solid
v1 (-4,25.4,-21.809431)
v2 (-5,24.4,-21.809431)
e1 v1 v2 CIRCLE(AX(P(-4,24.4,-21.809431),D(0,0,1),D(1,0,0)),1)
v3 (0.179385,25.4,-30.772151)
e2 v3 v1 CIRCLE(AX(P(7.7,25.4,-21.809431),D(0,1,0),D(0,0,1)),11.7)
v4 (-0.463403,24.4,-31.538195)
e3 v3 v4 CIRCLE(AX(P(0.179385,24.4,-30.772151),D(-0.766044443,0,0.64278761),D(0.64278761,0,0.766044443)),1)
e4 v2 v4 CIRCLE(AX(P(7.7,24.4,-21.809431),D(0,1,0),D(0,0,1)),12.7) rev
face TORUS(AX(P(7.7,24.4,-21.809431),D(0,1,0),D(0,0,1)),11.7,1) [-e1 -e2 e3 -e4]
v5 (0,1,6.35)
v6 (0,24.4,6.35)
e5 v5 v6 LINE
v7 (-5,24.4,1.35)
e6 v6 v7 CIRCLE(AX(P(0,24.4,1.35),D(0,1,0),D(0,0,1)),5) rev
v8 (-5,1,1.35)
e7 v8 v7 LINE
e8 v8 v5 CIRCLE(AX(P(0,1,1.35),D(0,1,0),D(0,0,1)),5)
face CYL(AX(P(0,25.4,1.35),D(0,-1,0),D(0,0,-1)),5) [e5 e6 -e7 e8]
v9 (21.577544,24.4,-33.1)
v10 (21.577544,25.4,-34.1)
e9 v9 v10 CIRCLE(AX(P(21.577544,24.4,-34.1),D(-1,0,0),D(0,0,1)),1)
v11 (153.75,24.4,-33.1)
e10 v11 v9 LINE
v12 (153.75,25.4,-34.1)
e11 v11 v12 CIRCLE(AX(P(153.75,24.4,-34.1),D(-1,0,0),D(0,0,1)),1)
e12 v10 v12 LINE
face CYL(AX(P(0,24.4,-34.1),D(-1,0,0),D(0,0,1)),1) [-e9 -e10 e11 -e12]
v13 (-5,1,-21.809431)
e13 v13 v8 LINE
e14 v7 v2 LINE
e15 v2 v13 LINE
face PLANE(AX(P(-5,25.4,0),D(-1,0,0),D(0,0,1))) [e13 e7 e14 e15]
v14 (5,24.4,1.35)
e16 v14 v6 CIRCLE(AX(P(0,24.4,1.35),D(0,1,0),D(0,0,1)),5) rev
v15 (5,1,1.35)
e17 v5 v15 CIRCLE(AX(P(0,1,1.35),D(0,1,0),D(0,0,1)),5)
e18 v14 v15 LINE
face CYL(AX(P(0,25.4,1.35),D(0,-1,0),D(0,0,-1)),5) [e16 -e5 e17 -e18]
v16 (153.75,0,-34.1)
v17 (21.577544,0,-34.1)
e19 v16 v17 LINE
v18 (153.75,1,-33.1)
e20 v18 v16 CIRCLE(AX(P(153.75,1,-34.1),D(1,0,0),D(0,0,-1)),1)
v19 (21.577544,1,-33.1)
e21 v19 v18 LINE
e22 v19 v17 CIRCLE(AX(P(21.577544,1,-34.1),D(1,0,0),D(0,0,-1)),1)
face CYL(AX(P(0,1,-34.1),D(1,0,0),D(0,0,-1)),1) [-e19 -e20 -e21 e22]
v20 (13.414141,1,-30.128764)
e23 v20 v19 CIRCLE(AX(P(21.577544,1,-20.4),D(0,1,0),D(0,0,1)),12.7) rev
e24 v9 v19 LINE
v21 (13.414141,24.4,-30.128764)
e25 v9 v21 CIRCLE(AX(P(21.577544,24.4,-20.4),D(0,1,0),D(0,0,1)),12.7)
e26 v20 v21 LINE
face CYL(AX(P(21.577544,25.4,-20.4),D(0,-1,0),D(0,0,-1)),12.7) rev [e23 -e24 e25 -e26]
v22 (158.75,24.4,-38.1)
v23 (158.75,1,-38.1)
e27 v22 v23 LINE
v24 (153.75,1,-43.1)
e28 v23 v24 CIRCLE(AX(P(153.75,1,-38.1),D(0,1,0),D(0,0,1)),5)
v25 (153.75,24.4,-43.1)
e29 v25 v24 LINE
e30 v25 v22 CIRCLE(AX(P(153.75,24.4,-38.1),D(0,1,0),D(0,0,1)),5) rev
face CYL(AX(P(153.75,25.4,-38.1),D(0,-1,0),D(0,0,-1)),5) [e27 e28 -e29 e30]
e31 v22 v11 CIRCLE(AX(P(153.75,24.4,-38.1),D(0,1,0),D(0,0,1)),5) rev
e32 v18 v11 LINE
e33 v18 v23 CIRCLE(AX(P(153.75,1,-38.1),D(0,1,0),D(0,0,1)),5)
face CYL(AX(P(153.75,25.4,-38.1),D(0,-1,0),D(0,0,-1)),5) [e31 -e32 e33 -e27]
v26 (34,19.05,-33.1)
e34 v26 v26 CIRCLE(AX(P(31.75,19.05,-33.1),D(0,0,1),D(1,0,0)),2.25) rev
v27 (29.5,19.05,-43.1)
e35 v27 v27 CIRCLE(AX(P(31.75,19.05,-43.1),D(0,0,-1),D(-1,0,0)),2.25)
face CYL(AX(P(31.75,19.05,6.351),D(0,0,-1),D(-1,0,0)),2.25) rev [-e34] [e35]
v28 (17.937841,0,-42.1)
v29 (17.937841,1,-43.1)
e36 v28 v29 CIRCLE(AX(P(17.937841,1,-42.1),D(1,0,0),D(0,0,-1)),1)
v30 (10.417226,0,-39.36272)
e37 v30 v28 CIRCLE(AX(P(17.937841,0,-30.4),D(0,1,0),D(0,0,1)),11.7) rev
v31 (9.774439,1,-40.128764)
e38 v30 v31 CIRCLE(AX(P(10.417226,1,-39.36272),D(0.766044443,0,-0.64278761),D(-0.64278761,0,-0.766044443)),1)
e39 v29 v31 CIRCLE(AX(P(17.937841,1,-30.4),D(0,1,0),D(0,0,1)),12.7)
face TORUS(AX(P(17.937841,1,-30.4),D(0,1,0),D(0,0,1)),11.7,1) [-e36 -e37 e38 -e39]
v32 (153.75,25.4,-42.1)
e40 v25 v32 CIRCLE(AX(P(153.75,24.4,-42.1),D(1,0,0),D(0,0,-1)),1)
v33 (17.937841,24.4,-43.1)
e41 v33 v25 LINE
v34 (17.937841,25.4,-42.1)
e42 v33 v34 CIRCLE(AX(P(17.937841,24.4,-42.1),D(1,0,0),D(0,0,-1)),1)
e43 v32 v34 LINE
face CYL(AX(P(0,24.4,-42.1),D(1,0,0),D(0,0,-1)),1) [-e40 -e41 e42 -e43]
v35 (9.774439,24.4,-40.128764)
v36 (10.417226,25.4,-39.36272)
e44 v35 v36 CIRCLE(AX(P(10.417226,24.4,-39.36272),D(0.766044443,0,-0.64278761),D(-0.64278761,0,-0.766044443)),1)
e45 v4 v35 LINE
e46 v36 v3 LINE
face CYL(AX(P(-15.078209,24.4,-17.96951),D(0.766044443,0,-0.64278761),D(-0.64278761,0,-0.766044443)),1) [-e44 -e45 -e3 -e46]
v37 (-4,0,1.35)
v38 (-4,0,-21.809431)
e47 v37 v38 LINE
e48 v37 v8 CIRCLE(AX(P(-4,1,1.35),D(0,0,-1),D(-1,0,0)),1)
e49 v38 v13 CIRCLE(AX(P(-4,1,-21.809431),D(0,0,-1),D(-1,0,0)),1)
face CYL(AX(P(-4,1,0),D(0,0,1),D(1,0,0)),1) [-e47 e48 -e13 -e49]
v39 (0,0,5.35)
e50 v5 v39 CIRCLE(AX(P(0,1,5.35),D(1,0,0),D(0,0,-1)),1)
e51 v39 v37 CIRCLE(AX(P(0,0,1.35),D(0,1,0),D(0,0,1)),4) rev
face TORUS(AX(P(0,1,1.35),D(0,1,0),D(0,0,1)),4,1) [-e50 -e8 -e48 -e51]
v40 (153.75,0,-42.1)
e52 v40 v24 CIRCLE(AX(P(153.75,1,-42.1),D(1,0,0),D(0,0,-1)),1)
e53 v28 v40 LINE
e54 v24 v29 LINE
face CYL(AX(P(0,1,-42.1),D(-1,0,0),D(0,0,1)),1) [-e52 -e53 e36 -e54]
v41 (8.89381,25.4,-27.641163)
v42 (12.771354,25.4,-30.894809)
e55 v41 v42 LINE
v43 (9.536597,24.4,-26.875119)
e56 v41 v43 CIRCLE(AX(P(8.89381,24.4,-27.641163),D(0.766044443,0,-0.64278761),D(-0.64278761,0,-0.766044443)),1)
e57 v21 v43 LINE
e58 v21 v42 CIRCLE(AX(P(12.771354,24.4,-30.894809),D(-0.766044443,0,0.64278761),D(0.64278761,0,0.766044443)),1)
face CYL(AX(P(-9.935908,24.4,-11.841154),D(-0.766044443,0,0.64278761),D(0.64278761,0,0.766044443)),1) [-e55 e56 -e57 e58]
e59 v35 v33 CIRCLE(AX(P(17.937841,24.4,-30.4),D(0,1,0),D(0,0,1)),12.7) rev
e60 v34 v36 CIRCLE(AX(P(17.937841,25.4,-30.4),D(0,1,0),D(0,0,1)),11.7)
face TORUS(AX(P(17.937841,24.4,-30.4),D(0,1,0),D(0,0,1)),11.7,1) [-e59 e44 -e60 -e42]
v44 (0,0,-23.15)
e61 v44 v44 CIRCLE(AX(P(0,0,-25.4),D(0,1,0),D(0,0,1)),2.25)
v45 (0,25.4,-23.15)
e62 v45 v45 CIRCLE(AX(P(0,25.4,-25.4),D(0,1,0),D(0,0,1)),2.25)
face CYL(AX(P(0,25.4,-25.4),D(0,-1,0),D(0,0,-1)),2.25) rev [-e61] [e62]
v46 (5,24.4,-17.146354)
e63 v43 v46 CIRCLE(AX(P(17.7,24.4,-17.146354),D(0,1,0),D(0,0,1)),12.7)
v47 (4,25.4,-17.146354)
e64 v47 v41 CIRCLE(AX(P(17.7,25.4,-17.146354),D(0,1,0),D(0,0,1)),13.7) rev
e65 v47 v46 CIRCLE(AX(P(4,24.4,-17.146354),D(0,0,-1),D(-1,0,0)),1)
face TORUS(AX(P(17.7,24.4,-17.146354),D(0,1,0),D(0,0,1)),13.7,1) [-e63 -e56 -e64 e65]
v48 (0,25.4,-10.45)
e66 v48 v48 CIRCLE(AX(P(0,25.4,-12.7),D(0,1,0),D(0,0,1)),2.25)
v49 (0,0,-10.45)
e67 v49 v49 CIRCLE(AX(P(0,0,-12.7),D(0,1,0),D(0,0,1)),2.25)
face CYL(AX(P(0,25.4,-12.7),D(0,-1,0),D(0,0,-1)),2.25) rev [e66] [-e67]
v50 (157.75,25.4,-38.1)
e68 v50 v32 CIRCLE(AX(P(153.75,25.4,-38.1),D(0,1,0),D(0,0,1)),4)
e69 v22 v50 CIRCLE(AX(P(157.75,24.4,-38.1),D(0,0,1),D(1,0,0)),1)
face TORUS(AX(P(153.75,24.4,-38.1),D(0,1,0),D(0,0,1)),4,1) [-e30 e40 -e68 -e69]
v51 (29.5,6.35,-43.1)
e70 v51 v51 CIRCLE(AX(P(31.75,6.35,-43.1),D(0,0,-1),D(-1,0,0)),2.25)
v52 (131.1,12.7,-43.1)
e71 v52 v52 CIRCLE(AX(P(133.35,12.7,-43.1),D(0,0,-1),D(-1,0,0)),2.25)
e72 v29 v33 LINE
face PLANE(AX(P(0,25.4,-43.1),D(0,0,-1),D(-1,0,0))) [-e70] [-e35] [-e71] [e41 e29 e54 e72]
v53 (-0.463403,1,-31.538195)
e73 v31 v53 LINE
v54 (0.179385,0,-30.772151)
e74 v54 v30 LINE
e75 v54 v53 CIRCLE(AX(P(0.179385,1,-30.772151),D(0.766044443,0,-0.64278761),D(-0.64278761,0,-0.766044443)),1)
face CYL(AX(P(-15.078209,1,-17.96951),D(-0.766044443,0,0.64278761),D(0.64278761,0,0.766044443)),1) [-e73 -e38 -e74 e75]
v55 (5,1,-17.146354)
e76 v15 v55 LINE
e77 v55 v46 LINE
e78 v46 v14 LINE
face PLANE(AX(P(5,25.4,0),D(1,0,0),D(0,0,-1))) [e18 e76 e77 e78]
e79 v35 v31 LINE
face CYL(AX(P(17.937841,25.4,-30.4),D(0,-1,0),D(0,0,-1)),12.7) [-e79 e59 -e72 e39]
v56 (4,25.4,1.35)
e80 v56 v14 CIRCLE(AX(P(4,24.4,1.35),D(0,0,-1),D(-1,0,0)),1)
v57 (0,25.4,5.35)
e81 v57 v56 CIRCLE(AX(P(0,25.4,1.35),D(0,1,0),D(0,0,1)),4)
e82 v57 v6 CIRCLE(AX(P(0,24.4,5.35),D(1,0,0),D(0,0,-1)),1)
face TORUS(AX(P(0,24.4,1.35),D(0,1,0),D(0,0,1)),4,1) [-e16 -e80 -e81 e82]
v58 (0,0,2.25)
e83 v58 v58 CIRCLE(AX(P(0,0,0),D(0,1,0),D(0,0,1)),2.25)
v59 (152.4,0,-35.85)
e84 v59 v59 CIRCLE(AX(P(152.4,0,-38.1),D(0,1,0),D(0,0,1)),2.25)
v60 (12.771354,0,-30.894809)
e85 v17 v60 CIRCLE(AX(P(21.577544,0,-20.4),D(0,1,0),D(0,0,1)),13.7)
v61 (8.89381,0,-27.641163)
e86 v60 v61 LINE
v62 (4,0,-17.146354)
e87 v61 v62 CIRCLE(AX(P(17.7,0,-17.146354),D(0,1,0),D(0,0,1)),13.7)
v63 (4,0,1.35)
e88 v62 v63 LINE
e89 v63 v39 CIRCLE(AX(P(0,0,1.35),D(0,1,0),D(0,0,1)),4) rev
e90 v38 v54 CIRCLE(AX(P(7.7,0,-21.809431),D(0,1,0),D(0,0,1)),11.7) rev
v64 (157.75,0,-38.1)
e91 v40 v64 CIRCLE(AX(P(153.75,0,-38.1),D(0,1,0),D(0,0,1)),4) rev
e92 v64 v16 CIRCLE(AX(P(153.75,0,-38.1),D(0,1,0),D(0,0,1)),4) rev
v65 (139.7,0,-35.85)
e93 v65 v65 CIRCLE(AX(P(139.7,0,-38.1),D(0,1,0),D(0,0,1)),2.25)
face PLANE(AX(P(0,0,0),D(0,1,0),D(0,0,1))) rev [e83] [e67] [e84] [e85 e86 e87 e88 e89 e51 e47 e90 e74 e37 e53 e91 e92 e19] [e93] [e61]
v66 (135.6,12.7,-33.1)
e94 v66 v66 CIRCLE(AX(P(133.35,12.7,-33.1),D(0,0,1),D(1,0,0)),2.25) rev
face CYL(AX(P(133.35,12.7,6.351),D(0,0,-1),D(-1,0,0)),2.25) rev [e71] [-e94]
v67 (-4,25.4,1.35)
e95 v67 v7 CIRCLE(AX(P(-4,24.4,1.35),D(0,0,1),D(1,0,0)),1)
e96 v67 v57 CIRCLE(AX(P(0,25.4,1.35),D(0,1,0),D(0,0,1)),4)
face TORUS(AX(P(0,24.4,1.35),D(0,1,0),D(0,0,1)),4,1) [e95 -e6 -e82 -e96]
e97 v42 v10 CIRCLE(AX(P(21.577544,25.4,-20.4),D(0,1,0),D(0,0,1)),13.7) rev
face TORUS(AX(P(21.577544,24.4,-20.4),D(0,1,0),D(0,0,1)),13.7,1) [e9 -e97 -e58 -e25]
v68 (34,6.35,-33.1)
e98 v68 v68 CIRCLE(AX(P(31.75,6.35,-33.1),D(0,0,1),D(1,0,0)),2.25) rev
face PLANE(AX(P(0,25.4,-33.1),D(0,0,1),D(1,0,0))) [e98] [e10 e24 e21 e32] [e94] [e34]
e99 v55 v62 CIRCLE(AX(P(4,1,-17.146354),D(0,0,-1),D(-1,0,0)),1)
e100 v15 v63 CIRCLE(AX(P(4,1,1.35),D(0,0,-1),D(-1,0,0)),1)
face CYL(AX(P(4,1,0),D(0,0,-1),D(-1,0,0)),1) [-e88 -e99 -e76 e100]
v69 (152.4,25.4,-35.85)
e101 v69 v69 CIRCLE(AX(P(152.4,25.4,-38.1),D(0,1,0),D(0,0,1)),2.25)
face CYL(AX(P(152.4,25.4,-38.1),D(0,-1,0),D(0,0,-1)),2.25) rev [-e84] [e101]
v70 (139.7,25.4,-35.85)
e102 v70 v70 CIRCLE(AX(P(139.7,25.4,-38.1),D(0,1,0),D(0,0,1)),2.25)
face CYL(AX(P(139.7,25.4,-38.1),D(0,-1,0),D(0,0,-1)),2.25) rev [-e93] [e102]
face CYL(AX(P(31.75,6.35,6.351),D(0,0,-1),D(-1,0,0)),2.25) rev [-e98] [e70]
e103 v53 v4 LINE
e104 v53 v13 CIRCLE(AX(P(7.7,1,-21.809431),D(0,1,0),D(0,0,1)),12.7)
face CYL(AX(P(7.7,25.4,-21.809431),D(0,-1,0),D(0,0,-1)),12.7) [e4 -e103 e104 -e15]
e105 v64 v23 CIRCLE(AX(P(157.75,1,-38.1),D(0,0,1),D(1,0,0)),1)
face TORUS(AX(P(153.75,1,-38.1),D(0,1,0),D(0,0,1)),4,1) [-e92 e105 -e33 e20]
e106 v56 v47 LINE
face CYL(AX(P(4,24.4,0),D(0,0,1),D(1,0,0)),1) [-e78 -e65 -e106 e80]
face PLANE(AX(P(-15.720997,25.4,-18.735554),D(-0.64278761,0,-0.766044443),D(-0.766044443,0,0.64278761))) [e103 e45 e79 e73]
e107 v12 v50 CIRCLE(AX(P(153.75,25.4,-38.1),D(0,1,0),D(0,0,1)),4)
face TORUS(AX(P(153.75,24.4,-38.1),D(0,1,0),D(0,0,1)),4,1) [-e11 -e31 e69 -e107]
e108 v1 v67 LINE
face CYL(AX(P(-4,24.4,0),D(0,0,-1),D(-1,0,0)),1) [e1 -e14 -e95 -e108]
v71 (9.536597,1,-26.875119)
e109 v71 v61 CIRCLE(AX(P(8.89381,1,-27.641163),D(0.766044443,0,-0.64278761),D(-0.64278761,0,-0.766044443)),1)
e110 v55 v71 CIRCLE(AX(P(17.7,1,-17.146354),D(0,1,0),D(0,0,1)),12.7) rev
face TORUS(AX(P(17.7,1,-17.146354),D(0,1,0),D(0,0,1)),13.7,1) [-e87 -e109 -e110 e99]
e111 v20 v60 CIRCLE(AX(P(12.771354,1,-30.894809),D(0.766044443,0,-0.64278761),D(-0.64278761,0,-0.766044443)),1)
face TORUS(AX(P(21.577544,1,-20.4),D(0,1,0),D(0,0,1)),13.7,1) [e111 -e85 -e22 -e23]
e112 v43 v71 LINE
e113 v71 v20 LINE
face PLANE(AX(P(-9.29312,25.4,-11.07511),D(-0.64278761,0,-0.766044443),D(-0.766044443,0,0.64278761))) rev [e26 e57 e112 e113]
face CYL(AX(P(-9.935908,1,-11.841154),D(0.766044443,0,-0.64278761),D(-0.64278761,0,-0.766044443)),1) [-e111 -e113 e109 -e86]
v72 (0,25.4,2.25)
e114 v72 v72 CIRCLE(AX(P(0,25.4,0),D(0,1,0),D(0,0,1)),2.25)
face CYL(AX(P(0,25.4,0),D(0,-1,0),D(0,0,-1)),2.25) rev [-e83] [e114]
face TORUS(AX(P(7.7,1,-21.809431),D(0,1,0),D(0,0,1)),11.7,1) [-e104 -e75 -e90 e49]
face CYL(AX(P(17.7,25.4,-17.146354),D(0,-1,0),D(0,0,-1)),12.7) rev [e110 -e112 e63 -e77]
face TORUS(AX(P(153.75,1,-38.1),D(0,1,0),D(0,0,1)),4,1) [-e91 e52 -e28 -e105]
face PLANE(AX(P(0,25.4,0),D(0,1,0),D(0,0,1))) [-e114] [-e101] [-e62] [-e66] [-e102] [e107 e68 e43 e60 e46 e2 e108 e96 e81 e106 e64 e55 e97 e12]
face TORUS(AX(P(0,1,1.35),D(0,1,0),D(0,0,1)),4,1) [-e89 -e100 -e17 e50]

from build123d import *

# Parameters (mm, degrees)
SKETCH1_R           = 2.25
BOSS_EXTRUDE1_DEPTH = 25.4
FILLET2_R           = 5
CUT_EXTRUDE2_REACH  = 170.202
SKETCH3_R           = 2.25
FILLET4_R           = 12.7
FILLET5_R           = 1


with BuildPart() as part:
    # Sketch1 → Boss-Extrude1 (new body)
    # profile 1 of 2: a face of its own
    with BuildSketch(Plane(origin=(0, 0, 0), x_dir=(1, 0, 0), z_dir=(0, 1, 0))):
        Polygon((158.75, 33.1), (158.75, 43.1), (13.315419455, 43.1), (-5, 27.731538291), (-5, -6.35), (5, -6.35), (5, 23.068461709), (5, 33.1), (16.955121797, 33.1), align=None)
        with Locations(Location((0, 0, 0), (0, 0, 270))):
            Circle(SKETCH1_R, mode=Mode.SUBTRACT)
        with Locations(Location((0, 12.7, 0), (0, 0, 270))):
            Circle(SKETCH1_R, mode=Mode.SUBTRACT)
        with Locations(Location((0, 25.4, 0), (0, 0, 270))):
            Circle(SKETCH1_R, mode=Mode.SUBTRACT)
        with Locations(Location((139.7, 38.1, 0), (0, 0, 270))):
            Circle(SKETCH1_R, mode=Mode.SUBTRACT)
        with Locations(Location((152.4, 38.1, 0), (0, 0, 270))):
            Circle(SKETCH1_R, mode=Mode.SUBTRACT)
    # profile 2 of 2: a face of its own
    with BuildSketch(Plane(origin=(0, 0, 0), x_dir=(1, 0, 0), z_dir=(0, 1, 0))):
        Polygon((5, 23.068461709), (16.955121797, 33.1), (5, 33.1), align=None)
    extrude(amount=BOSS_EXTRUDE1_DEPTH)

    # Fillet2
    fillet2_edges = [part.edges().sort_by_distance(p)[0] for p in [
        (-5, 12.7, 6.35),
        (5, 12.7, 6.35),
        (158.75, 12.7, -43.1),
        (158.75, 12.7, -33.1),
    ]]
    fillet(fillet2_edges, radius=FILLET2_R - 0.0001)  # a hair under: the kernel refuses the full size

    # Sketch3 → Cut-Extrude2 (cut, up to next)
    with BuildSketch(Plane(origin=(0, 0, -43.1), x_dir=(-1, 0, 0), z_dir=(0, 0, -1)), mode=Mode.PRIVATE) as cut_extrude2_sk1:
        with Locations((-31.75, 6.35)):
            Circle(SKETCH3_R)
    cut_extrude2_tool1 = extrude(cut_extrude2_sk1.sketch, amount=-CUT_EXTRUDE2_REACH, mode=Mode.PRIVATE) & part.part
    # Sketch3 → Cut-Extrude2 (cut, up to next)
    with BuildSketch(Plane(origin=(0, 0, -43.1), x_dir=(-1, 0, 0), z_dir=(0, 0, -1)), mode=Mode.PRIVATE) as cut_extrude2_sk2:
        with Locations((-31.75, 19.05)):
            Circle(SKETCH3_R)
    cut_extrude2_tool2 = extrude(cut_extrude2_sk2.sketch, amount=-CUT_EXTRUDE2_REACH, mode=Mode.PRIVATE) & part.part
    # Sketch3 → Cut-Extrude2 (cut, up to next)
    with BuildSketch(Plane(origin=(0, 0, -43.1), x_dir=(-1, 0, 0), z_dir=(0, 0, -1)), mode=Mode.PRIVATE) as cut_extrude2_sk3:
        with Locations((-133.35, 12.7)):
            Circle(SKETCH3_R)
    cut_extrude2_tool3 = extrude(cut_extrude2_sk3.sketch, amount=-CUT_EXTRUDE2_REACH, mode=Mode.PRIVATE) & part.part
    add(cut_extrude2_tool1.solids().sort_by_distance((31.75, 6.35, -43.1))[0], mode=Mode.SUBTRACT)
    add(cut_extrude2_tool2.solids().sort_by_distance((31.75, 19.05, -43.1))[0], mode=Mode.SUBTRACT)
    add(cut_extrude2_tool3.solids().sort_by_distance((133.35, 12.7, -43.1))[0], mode=Mode.SUBTRACT)

    # Fillet4
    fillet4_edges = [part.edges().sort_by_distance(p)[0] for p in [
        (-5, 12.7, -27.731538291),
        (13.315419455, 12.7, -43.1),
        (16.955121797, 12.7, -33.1),
        (5, 12.7, -23.068461709),
    ]]
    fillet(fillet4_edges, radius=FILLET4_R)

    # Fillet5
    fillet5_edges = [part.edges().sort_by_distance(p)[0] for p in [
        (-5, 0, -10.229665516),
        (87.663821886, 0, -33.1),
        (157.285563195, 0, -34.564436805),
        (157.285563195, 0, -41.635563195),
        (3.535563195, 0, 4.885563195),
        (-3.535563195, 0, 4.885563195),
        (-5, 25.4, -10.229665516),
        (87.663821886, 25.4, -33.1),
        (157.285563195, 25.4, -34.564436805),
        (157.285563195, 25.4, -41.635563195),
        (3.535563195, 25.4, 4.885563195),
        (-3.535563195, 25.4, 4.885563195),
        (11.475369243, 0, -28.501941653),
        (11.475369243, 25.4, -28.501941653),
        (5, 25.4, -7.898127225),
        (5, 0, -7.898127225),
        (4.655518072, 0, -35.833479944),
        (4.655518072, 25.4, -35.833479944),
        (85.843970715, 0, -43.1),
        (-3.810108895, 0, -27.176682956),
        (13.59418561, 0, -42.334096284),
        (85.843970715, 25.4, -43.1),
        (-3.810108895, 25.4, -27.176682956),
        (13.59418561, 25.4, -42.334096284),
        (17.233887952, 0, -32.334096284),
        (17.233887952, 25.4, -32.334096284),
        (6.189891105, 0, -22.513606375),
        (6.189891105, 25.4, -22.513606375),
    ]]
    fillet(fillet5_edges, radius=FILLET5_R)


solid = part.part
